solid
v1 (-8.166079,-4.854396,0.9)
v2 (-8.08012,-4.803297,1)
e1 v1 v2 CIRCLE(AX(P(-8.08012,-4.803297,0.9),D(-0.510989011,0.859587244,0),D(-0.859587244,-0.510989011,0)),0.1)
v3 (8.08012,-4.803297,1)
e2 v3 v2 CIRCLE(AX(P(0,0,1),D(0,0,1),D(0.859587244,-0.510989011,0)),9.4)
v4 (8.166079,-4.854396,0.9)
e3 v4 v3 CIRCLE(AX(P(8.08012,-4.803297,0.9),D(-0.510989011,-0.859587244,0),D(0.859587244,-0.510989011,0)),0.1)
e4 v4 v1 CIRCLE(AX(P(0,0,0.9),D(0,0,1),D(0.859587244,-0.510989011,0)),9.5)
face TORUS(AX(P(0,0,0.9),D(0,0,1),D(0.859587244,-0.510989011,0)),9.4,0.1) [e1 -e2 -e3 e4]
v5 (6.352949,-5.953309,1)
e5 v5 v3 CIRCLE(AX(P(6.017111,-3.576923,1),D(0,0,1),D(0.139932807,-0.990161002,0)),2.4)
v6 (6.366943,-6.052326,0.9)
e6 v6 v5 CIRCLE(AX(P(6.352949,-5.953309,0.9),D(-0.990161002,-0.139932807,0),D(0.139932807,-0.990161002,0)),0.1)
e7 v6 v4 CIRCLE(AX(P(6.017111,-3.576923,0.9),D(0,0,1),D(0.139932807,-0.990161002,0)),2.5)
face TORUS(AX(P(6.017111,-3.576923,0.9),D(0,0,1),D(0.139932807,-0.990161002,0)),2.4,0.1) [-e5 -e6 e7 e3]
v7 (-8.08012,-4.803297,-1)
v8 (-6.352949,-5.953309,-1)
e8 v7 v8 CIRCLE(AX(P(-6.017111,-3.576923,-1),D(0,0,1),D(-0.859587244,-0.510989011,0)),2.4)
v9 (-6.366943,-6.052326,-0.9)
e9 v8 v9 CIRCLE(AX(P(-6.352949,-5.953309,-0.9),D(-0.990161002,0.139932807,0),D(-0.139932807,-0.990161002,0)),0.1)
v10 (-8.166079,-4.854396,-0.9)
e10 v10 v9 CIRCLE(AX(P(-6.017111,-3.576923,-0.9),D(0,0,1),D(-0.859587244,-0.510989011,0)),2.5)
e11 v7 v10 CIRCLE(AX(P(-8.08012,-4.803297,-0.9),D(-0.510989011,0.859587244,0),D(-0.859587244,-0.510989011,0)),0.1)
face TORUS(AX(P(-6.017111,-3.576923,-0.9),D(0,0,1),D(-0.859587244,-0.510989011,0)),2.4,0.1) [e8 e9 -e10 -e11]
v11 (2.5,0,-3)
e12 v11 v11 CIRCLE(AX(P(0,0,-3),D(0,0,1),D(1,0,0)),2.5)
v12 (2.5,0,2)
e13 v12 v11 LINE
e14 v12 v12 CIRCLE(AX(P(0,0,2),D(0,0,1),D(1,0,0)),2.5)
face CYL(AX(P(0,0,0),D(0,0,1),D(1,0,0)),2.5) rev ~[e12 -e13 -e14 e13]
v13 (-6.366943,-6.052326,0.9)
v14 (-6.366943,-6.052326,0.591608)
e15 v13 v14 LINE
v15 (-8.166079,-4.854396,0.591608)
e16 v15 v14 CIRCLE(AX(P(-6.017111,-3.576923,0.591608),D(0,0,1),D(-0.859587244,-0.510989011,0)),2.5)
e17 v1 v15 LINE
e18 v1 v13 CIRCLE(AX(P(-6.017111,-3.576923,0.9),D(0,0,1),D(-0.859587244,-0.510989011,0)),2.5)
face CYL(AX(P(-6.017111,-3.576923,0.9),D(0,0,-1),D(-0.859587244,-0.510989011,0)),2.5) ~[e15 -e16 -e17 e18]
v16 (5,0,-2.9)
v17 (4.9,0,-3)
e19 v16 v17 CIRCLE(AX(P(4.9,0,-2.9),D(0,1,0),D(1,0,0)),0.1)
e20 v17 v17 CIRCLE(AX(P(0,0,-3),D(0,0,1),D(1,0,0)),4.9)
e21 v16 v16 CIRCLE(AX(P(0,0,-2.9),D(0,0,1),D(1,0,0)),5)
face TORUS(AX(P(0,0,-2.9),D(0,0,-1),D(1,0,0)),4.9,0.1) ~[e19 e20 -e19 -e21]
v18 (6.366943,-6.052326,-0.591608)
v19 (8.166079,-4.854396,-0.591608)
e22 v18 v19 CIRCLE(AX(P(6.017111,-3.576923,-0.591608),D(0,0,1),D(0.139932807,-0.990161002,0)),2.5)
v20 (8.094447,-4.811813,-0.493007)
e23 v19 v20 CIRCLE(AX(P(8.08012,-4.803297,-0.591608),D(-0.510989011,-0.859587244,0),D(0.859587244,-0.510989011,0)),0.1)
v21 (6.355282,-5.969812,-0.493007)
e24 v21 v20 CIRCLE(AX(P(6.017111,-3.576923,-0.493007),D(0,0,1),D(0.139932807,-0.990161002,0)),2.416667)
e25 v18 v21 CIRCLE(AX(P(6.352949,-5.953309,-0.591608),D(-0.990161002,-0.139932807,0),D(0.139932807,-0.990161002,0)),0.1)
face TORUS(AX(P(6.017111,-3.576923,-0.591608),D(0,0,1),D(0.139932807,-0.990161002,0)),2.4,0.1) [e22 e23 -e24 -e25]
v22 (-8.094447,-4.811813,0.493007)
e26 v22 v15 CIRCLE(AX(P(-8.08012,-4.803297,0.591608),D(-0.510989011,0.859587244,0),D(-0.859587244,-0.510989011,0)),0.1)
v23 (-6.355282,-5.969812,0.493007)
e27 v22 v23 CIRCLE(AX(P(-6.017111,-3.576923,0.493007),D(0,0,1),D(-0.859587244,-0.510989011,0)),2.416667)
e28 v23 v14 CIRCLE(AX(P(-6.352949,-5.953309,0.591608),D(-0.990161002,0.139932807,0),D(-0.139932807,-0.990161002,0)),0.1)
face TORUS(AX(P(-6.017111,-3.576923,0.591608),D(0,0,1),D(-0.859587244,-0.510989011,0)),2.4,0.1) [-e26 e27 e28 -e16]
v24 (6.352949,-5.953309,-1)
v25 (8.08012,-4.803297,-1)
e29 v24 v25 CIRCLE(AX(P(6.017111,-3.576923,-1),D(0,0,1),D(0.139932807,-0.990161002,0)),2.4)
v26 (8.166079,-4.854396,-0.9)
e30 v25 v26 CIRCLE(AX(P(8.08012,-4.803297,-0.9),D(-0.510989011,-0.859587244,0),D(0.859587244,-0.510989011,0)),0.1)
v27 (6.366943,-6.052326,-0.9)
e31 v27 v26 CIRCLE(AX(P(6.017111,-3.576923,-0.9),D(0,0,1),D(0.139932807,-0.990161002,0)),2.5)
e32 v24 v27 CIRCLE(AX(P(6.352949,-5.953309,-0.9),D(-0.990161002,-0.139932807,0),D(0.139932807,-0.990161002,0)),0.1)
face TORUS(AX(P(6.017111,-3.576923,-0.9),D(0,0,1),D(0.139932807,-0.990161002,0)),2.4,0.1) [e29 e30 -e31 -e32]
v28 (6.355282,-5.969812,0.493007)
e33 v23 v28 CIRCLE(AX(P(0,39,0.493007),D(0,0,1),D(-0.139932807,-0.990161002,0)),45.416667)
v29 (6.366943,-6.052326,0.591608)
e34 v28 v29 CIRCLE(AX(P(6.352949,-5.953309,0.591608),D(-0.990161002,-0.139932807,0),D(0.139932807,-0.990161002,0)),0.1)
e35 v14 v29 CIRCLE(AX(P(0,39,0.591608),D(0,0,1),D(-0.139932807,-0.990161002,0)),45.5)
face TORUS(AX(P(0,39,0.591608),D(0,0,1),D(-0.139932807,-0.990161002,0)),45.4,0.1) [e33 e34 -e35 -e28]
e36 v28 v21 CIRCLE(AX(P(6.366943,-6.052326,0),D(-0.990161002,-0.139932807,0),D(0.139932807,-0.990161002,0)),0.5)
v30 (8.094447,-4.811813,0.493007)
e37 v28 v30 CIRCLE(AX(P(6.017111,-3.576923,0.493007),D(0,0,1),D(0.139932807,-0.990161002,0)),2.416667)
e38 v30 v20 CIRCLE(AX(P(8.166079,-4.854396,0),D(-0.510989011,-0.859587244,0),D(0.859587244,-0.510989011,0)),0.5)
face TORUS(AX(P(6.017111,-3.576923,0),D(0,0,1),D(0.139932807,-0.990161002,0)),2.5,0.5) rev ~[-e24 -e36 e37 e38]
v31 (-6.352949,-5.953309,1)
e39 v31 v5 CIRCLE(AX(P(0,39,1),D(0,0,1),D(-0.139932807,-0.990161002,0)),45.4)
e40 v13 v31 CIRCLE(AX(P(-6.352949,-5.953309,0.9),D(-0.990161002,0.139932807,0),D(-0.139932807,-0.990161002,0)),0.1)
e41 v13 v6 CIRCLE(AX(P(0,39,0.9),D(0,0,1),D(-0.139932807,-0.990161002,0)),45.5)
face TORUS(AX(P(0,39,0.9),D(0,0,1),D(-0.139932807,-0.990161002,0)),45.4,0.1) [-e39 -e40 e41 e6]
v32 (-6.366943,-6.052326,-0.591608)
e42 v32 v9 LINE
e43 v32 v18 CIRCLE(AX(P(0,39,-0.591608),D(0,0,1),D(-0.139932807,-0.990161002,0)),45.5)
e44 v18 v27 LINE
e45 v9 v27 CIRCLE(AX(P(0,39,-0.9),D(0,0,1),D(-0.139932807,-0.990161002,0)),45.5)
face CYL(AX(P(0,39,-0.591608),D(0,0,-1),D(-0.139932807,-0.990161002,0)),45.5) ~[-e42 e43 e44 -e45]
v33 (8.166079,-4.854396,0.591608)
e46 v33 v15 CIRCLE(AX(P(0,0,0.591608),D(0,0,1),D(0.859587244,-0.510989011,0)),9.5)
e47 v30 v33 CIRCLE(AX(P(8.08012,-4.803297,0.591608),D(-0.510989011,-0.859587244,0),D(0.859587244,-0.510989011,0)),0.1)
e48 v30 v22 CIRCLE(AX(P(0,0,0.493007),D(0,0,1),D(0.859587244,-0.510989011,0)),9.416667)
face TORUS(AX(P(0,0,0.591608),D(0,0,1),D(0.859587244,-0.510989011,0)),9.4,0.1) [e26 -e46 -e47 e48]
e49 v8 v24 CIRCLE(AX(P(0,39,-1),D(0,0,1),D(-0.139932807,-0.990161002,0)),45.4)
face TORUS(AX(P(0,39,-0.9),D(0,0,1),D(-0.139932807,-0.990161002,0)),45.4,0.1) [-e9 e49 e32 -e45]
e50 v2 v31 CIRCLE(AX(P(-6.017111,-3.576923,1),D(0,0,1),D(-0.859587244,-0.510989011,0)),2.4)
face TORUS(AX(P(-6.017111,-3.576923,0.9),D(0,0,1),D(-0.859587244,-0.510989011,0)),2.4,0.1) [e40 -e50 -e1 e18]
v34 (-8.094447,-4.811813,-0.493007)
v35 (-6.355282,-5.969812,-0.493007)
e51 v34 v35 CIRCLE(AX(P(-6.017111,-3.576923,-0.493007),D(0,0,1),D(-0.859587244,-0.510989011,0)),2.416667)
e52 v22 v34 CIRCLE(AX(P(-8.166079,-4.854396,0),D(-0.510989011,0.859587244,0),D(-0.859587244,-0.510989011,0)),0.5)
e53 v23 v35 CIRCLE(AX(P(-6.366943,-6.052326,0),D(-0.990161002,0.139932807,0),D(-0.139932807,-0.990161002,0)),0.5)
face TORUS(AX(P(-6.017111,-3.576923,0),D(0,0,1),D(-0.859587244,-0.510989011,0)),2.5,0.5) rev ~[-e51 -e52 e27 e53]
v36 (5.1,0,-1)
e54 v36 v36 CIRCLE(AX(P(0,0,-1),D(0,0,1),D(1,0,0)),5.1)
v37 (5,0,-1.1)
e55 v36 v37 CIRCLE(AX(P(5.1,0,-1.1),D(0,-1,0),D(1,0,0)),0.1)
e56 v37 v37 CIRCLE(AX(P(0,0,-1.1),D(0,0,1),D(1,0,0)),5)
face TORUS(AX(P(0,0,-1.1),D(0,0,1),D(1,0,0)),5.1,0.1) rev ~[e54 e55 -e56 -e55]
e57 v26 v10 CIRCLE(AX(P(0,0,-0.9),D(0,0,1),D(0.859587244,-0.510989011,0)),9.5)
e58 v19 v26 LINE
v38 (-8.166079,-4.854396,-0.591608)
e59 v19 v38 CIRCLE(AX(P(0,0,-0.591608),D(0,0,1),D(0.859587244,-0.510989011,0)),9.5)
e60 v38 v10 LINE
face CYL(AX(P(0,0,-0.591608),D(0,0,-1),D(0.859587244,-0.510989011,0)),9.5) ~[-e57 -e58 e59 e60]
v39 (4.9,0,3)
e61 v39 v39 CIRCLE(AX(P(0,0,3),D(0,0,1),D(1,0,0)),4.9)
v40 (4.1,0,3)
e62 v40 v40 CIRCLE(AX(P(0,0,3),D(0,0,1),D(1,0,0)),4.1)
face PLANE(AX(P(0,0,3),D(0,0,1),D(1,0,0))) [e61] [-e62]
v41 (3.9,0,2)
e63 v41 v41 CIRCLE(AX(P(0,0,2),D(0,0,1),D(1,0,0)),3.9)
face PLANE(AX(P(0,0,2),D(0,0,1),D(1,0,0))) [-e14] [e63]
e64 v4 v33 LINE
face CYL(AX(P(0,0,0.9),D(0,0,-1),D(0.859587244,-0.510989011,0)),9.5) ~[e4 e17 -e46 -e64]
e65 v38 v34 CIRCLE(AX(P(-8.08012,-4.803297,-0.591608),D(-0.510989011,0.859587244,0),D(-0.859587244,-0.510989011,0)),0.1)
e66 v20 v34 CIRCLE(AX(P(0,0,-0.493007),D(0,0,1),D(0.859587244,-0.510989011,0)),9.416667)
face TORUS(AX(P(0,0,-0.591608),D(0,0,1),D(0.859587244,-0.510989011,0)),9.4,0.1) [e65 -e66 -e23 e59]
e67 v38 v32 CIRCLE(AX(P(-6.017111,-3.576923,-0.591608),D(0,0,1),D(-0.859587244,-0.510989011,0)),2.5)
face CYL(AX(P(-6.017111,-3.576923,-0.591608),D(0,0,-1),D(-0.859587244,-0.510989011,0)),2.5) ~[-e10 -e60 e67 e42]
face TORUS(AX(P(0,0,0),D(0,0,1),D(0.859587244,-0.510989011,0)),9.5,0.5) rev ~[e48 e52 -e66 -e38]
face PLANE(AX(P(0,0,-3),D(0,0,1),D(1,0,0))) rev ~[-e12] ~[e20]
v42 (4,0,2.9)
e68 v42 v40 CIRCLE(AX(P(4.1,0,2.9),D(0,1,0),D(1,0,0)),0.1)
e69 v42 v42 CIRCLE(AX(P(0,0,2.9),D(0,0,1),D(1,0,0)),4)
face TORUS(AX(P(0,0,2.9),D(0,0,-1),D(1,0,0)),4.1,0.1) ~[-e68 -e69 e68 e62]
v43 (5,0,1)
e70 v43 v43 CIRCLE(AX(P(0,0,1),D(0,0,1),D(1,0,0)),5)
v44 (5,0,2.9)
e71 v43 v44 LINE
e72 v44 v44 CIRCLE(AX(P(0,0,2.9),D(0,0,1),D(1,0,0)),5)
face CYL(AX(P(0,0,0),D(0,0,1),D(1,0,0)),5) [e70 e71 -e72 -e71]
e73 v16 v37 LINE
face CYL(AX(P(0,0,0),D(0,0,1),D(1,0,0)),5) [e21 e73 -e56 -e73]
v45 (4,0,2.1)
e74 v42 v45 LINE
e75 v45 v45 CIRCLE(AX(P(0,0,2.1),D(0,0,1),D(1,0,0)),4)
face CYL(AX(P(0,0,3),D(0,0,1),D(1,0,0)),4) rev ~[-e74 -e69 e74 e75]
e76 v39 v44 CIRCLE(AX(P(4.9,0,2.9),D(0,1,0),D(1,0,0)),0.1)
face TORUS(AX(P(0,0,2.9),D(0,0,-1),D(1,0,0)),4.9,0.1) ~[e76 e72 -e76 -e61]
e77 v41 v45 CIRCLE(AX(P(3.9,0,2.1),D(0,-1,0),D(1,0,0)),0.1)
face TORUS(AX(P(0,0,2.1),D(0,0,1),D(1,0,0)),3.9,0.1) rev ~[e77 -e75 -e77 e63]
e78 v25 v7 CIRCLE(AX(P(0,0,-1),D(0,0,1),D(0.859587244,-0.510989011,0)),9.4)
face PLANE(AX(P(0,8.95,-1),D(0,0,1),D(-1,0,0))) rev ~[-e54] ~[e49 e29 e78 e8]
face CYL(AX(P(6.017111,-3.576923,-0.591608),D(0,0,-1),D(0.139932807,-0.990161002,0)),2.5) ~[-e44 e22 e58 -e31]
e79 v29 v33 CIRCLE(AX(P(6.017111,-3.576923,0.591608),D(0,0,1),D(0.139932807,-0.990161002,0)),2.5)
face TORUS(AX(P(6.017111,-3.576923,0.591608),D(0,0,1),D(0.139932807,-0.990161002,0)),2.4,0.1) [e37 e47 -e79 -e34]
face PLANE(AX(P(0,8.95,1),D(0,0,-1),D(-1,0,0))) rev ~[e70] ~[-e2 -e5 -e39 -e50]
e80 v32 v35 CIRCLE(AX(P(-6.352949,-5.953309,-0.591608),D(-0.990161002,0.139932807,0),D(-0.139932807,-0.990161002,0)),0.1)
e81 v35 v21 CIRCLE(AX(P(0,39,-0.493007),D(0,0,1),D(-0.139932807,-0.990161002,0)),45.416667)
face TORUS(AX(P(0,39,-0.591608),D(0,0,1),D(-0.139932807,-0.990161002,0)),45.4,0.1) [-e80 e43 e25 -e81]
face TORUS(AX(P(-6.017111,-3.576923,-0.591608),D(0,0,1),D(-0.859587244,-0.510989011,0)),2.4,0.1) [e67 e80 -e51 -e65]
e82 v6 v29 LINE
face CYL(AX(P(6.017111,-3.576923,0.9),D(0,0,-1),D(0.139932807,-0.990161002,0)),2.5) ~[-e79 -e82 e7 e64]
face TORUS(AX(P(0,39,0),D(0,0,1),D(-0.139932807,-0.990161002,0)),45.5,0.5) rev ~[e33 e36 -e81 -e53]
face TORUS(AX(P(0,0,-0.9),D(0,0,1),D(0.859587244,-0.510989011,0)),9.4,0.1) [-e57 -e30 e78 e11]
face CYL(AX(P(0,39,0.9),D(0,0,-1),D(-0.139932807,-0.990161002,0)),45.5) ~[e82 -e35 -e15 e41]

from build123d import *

# Parameters (mm, degrees)
F3_R           = 5
F4_DEPTH       = 3
F4_DEPTH_BACK  = 3
F6_R           = 10
F6_R_2         = 2.5
F7_DEPTH       = 1
F7_DEPTH_BACK  = 1
F10_R          = 2.5
F11_DEPTH      = 3.001
F11_DEPTH_BACK = 3.001
F12_R          = 4
F13_DEPTH      = 1
F14_R          = 0.1


# Not quite as in the source:
# - a feature names something its author has since deleted; it is built from what else it names


with BuildPart() as f4:
    # F3 (on Top) → F4 (new body, two sides)
    with BuildSketch(Plane.XY) as f4_sk:
        Circle(F3_R)
    extrude(amount=F4_DEPTH)
    extrude(f4_sk.sketch, amount=-F4_DEPTH_BACK)

    # F6 (on Top) → F7 (join, two sides)
    with BuildSketch(Plane.XY) as f7_sk:
        Circle(F6_R)
        Circle(F6_R_2, mode=Mode.SUBTRACT)
    extrude(amount=F7_DEPTH)
    extrude(f7_sk.sketch, amount=-F7_DEPTH_BACK)

    # F9: sweep along a path in F5
    with BuildLine(Plane.XY) as f9_path:
        ThreePointArc((7.7362851991, -4.5989010989), (0, 9), (-7.7362851991, -4.5989010989))
        ThreePointArc((-7.7362851991, -4.5989010989), (-7.1255538214, -5.2416614557), (-6.2969763249, -5.5572450805))
        ThreePointArc((-6.2969763249, -5.5572450805), (0, -6), (6.2969763249, -5.5572450805))
        ThreePointArc((6.2969763249, -5.5572450805), (7.1255538214, -5.2416614557), (7.7362851991, -4.5989010989))
    # F8 (on Front) → F9 (sweep, cut)
    with BuildSketch(Plane.XZ):
        with BuildLine():
            ThreePointArc((9.5, 0.5916079783), (9.4763762616, 0.5270582559), (9.4166666667, 0.4930066486))
            ThreePointArc((9.4166666667, 0.4930066486), (9, 0), (9.4166666667, -0.4930066486))
            ThreePointArc((9.4166666667, -0.4930066486), (9.4763762616, -0.5270582559), (9.5, -0.5916079783))
            Line((9.5, -0.5916079783), (9.5, -0.9))
            ThreePointArc((9.5, -0.9), (9.4707106781, -0.9707106781), (9.4, -1))
            Line((9.4, -1), (8.5, -1))
            Line((8.5, -1), (8.5, -2))
            Line((8.5, -2), (18, -2))
            Line((18, -2), (18, 2))
            Line((18, 2), (8.5, 2))
            Line((8.5, 2), (8.5, 1))
            Line((8.5, 1), (9.4, 1))
            ThreePointArc((9.4, 1), (9.4707106781, 0.9707106781), (9.5, 0.9))
            Line((9.5, 0.9), (9.5, 0.5916079783))
        make_face()
    sweep(path=f9_path.line, mode=Mode.SUBTRACT)

    # F10 (on Top) → F11 (cut, two sides)
    with BuildSketch(Plane.XY) as f11_sk:
        Circle(F10_R)
    extrude(amount=-F11_DEPTH, mode=Mode.SUBTRACT)
    extrude(f11_sk.sketch, amount=F11_DEPTH_BACK, mode=Mode.SUBTRACT)

    # F12 (on face) → F13 (cut)
    with BuildSketch(Plane.XY.offset(3)):
        Circle(F12_R)
    extrude(amount=-F13_DEPTH, mode=Mode.SUBTRACT)

    # F14
    f14_edges = [f4.edges().sort_by_distance(p)[0] for p in [
        (-4, 0, 3),
        (-4, 0, 2),
        (-5, 0, 3),
        (-5, 0, -1),
        (-5, 0, -3),
    ]]
    fillet(f14_edges, radius=F14_R)


solid = f4.part
